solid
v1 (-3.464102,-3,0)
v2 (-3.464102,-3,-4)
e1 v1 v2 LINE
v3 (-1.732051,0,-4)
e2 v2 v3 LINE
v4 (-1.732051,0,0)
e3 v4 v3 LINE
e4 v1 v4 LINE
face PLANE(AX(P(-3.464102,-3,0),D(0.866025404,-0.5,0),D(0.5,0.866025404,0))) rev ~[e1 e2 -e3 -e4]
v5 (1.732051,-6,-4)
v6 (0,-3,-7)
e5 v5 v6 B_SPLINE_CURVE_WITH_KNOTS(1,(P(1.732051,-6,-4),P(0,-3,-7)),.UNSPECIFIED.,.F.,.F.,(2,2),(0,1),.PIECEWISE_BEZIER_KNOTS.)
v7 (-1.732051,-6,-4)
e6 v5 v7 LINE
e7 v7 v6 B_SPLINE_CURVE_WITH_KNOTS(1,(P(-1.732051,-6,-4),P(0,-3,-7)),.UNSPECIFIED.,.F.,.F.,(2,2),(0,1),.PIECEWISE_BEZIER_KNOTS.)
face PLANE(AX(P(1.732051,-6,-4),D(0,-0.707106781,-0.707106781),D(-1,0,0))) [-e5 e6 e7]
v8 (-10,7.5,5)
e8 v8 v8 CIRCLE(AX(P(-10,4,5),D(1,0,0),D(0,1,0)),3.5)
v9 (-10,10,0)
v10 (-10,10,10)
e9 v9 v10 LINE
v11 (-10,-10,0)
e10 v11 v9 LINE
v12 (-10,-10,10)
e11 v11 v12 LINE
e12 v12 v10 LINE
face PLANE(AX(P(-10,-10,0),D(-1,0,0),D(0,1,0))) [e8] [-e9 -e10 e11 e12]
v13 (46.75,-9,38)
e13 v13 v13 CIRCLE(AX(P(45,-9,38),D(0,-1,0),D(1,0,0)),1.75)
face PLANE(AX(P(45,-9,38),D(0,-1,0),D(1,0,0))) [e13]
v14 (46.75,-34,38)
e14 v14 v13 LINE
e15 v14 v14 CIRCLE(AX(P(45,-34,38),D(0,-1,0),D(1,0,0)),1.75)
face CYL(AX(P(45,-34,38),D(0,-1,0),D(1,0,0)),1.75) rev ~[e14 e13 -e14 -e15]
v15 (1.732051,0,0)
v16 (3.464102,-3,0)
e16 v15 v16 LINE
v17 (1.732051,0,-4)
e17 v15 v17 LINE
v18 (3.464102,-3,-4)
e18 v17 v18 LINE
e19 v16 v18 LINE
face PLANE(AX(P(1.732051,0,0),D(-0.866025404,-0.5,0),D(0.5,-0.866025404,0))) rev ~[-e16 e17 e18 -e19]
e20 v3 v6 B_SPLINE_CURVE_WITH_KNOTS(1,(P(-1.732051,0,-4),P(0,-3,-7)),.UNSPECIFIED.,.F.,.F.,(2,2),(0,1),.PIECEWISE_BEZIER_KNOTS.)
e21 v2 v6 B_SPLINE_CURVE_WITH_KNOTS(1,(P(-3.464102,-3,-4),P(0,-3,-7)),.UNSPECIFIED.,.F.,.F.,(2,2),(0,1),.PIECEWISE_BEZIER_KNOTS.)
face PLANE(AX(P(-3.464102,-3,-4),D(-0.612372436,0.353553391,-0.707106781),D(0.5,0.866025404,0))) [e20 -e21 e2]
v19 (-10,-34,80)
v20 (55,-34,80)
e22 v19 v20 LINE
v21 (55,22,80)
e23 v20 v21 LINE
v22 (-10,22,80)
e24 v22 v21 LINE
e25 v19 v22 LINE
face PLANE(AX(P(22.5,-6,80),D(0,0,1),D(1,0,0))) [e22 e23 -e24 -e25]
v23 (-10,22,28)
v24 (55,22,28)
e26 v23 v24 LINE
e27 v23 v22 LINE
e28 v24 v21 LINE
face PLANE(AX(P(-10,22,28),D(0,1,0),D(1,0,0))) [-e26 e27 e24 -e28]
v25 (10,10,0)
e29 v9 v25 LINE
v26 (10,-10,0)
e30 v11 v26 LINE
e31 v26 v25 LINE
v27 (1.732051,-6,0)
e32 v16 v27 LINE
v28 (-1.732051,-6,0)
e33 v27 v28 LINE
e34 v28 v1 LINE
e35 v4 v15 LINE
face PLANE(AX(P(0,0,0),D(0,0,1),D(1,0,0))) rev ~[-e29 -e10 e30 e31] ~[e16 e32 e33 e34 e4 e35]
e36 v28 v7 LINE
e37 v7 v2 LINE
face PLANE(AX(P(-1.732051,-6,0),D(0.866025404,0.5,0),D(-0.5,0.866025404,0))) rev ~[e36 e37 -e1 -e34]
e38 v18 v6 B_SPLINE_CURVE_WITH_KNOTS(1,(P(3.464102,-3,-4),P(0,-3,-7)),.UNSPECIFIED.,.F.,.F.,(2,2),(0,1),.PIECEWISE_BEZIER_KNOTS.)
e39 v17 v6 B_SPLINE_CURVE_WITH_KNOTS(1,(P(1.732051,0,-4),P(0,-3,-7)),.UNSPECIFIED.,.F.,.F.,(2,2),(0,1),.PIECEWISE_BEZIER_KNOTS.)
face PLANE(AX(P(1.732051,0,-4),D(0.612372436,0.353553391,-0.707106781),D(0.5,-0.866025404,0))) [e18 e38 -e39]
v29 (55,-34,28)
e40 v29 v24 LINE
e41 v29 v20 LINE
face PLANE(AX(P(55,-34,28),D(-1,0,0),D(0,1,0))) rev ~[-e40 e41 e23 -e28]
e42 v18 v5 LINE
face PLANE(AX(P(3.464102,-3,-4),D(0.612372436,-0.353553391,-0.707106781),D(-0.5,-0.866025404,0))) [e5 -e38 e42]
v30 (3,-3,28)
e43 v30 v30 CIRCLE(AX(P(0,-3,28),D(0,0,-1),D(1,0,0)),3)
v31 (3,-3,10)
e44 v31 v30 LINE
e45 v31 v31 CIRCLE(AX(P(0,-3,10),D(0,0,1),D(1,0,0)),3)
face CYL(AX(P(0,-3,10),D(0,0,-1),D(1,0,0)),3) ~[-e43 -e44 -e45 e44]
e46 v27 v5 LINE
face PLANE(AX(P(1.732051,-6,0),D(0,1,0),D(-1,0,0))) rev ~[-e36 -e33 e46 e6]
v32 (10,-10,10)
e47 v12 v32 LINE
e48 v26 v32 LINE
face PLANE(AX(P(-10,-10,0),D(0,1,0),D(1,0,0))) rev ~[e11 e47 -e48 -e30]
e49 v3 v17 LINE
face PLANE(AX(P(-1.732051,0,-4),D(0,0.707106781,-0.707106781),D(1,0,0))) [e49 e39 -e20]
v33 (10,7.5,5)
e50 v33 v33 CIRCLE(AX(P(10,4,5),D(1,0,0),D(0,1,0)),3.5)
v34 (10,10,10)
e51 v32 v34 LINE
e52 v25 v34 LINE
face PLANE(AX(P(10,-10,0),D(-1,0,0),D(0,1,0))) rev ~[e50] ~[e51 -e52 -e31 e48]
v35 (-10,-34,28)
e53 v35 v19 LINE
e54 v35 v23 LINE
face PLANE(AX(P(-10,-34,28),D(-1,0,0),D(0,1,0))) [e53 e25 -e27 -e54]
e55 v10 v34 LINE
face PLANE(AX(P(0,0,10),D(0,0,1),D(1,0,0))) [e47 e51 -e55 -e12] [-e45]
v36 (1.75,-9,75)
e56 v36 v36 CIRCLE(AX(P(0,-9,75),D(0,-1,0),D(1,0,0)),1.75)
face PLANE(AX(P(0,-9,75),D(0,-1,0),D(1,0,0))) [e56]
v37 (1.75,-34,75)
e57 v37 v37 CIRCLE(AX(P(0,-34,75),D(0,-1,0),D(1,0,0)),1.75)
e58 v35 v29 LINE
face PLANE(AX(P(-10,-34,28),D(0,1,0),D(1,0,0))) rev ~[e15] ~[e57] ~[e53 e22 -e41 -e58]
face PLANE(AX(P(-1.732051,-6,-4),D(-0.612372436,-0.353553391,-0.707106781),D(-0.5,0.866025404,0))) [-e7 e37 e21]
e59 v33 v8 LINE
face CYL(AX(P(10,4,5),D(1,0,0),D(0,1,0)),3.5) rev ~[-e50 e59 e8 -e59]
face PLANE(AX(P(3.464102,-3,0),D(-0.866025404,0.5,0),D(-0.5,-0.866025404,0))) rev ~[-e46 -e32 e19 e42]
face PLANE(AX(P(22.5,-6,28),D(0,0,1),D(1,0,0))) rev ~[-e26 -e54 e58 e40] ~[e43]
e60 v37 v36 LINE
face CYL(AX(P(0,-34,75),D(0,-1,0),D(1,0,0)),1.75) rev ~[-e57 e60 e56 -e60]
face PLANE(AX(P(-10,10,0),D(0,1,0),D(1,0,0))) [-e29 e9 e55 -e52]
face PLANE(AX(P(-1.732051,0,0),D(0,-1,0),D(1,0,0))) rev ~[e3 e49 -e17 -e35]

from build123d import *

# Parameters (mm, degrees)
F0_W      = 20
F0_H      = 20
F1_DEPTH  = 10
F2_R      = 3.5
F3_DEPTH  = 20.001
F4_R      = 3
F5_DEPTH  = 35
F7_DEPTH  = 4
F11_W     = 65
F11_H     = 56
F12_DEPTH = 52
F13_R     = 1.75
F14_DEPTH = 25


# Not quite as in the source:
# - an extrude whose draft closes it to a point is written as a loft to that point


with BuildPart() as f1:
    # F0 (on Top) → F1 (new body)
    with BuildSketch(Plane.XY):
        Rectangle(F0_W, F0_H)
    extrude(amount=F1_DEPTH)

    # F2 (on face) → F3 (cut, through all)
    with BuildSketch(Plane.YZ.offset(10)):
        with Locations((4, 5)):
            Circle(F2_R)
    extrude(amount=-F3_DEPTH, mode=Mode.SUBTRACT)

    # F4 (on face) → F5 (join)
    with BuildSketch(Plane.XY.offset(10)):
        with Locations((0, -3)):
            Circle(F4_R)
    extrude(amount=F5_DEPTH)

    # F6 (on face) → F7 (join)
    with BuildSketch(Plane(origin=(0, 0, 0), x_dir=(1, 0, 0), z_dir=(0, 0, -1))):
        Polygon((-3.4641016151, 3), (-1.7320508076, 0), (1.7320508076, 0), (3.4641016151, 3), (1.7320508076, 6), (-1.7320508076, 6), align=None)
    extrude(amount=F7_DEPTH)

    # F7_face (on face) → F8 section 0
    with BuildSketch(Plane(origin=(0, -3, -4), x_dir=(1, 0, 0), z_dir=(0, 0, -1)), mode=Mode.PRIVATE) as f8_s0:
        Polygon((-1.7320508076, 3), (-3.4641016151, 0), (-1.7320508076, -3), (1.7320508076, -3), (3.4641016151, 0), (1.7320508076, 3), align=None)
    loft([f8_s0.sketch, Vertex(0, -3, -7)], ruled=True)

    # F11 (on offset) → F12 (join)
    with BuildSketch(Plane.XY.offset(28)):
        with Locations((22.5, -6)):
            Rectangle(F11_W, F11_H)
    extrude(amount=F12_DEPTH)

    # F13 (on face) → F14 (cut)
    with BuildSketch(Plane.XZ.offset(34)):
        with Locations((0, 75)):
            Circle(F13_R)
        with Locations((45, 38)):
            Circle(F13_R)
    extrude(amount=-F14_DEPTH, mode=Mode.SUBTRACT)


solid = f1.part
